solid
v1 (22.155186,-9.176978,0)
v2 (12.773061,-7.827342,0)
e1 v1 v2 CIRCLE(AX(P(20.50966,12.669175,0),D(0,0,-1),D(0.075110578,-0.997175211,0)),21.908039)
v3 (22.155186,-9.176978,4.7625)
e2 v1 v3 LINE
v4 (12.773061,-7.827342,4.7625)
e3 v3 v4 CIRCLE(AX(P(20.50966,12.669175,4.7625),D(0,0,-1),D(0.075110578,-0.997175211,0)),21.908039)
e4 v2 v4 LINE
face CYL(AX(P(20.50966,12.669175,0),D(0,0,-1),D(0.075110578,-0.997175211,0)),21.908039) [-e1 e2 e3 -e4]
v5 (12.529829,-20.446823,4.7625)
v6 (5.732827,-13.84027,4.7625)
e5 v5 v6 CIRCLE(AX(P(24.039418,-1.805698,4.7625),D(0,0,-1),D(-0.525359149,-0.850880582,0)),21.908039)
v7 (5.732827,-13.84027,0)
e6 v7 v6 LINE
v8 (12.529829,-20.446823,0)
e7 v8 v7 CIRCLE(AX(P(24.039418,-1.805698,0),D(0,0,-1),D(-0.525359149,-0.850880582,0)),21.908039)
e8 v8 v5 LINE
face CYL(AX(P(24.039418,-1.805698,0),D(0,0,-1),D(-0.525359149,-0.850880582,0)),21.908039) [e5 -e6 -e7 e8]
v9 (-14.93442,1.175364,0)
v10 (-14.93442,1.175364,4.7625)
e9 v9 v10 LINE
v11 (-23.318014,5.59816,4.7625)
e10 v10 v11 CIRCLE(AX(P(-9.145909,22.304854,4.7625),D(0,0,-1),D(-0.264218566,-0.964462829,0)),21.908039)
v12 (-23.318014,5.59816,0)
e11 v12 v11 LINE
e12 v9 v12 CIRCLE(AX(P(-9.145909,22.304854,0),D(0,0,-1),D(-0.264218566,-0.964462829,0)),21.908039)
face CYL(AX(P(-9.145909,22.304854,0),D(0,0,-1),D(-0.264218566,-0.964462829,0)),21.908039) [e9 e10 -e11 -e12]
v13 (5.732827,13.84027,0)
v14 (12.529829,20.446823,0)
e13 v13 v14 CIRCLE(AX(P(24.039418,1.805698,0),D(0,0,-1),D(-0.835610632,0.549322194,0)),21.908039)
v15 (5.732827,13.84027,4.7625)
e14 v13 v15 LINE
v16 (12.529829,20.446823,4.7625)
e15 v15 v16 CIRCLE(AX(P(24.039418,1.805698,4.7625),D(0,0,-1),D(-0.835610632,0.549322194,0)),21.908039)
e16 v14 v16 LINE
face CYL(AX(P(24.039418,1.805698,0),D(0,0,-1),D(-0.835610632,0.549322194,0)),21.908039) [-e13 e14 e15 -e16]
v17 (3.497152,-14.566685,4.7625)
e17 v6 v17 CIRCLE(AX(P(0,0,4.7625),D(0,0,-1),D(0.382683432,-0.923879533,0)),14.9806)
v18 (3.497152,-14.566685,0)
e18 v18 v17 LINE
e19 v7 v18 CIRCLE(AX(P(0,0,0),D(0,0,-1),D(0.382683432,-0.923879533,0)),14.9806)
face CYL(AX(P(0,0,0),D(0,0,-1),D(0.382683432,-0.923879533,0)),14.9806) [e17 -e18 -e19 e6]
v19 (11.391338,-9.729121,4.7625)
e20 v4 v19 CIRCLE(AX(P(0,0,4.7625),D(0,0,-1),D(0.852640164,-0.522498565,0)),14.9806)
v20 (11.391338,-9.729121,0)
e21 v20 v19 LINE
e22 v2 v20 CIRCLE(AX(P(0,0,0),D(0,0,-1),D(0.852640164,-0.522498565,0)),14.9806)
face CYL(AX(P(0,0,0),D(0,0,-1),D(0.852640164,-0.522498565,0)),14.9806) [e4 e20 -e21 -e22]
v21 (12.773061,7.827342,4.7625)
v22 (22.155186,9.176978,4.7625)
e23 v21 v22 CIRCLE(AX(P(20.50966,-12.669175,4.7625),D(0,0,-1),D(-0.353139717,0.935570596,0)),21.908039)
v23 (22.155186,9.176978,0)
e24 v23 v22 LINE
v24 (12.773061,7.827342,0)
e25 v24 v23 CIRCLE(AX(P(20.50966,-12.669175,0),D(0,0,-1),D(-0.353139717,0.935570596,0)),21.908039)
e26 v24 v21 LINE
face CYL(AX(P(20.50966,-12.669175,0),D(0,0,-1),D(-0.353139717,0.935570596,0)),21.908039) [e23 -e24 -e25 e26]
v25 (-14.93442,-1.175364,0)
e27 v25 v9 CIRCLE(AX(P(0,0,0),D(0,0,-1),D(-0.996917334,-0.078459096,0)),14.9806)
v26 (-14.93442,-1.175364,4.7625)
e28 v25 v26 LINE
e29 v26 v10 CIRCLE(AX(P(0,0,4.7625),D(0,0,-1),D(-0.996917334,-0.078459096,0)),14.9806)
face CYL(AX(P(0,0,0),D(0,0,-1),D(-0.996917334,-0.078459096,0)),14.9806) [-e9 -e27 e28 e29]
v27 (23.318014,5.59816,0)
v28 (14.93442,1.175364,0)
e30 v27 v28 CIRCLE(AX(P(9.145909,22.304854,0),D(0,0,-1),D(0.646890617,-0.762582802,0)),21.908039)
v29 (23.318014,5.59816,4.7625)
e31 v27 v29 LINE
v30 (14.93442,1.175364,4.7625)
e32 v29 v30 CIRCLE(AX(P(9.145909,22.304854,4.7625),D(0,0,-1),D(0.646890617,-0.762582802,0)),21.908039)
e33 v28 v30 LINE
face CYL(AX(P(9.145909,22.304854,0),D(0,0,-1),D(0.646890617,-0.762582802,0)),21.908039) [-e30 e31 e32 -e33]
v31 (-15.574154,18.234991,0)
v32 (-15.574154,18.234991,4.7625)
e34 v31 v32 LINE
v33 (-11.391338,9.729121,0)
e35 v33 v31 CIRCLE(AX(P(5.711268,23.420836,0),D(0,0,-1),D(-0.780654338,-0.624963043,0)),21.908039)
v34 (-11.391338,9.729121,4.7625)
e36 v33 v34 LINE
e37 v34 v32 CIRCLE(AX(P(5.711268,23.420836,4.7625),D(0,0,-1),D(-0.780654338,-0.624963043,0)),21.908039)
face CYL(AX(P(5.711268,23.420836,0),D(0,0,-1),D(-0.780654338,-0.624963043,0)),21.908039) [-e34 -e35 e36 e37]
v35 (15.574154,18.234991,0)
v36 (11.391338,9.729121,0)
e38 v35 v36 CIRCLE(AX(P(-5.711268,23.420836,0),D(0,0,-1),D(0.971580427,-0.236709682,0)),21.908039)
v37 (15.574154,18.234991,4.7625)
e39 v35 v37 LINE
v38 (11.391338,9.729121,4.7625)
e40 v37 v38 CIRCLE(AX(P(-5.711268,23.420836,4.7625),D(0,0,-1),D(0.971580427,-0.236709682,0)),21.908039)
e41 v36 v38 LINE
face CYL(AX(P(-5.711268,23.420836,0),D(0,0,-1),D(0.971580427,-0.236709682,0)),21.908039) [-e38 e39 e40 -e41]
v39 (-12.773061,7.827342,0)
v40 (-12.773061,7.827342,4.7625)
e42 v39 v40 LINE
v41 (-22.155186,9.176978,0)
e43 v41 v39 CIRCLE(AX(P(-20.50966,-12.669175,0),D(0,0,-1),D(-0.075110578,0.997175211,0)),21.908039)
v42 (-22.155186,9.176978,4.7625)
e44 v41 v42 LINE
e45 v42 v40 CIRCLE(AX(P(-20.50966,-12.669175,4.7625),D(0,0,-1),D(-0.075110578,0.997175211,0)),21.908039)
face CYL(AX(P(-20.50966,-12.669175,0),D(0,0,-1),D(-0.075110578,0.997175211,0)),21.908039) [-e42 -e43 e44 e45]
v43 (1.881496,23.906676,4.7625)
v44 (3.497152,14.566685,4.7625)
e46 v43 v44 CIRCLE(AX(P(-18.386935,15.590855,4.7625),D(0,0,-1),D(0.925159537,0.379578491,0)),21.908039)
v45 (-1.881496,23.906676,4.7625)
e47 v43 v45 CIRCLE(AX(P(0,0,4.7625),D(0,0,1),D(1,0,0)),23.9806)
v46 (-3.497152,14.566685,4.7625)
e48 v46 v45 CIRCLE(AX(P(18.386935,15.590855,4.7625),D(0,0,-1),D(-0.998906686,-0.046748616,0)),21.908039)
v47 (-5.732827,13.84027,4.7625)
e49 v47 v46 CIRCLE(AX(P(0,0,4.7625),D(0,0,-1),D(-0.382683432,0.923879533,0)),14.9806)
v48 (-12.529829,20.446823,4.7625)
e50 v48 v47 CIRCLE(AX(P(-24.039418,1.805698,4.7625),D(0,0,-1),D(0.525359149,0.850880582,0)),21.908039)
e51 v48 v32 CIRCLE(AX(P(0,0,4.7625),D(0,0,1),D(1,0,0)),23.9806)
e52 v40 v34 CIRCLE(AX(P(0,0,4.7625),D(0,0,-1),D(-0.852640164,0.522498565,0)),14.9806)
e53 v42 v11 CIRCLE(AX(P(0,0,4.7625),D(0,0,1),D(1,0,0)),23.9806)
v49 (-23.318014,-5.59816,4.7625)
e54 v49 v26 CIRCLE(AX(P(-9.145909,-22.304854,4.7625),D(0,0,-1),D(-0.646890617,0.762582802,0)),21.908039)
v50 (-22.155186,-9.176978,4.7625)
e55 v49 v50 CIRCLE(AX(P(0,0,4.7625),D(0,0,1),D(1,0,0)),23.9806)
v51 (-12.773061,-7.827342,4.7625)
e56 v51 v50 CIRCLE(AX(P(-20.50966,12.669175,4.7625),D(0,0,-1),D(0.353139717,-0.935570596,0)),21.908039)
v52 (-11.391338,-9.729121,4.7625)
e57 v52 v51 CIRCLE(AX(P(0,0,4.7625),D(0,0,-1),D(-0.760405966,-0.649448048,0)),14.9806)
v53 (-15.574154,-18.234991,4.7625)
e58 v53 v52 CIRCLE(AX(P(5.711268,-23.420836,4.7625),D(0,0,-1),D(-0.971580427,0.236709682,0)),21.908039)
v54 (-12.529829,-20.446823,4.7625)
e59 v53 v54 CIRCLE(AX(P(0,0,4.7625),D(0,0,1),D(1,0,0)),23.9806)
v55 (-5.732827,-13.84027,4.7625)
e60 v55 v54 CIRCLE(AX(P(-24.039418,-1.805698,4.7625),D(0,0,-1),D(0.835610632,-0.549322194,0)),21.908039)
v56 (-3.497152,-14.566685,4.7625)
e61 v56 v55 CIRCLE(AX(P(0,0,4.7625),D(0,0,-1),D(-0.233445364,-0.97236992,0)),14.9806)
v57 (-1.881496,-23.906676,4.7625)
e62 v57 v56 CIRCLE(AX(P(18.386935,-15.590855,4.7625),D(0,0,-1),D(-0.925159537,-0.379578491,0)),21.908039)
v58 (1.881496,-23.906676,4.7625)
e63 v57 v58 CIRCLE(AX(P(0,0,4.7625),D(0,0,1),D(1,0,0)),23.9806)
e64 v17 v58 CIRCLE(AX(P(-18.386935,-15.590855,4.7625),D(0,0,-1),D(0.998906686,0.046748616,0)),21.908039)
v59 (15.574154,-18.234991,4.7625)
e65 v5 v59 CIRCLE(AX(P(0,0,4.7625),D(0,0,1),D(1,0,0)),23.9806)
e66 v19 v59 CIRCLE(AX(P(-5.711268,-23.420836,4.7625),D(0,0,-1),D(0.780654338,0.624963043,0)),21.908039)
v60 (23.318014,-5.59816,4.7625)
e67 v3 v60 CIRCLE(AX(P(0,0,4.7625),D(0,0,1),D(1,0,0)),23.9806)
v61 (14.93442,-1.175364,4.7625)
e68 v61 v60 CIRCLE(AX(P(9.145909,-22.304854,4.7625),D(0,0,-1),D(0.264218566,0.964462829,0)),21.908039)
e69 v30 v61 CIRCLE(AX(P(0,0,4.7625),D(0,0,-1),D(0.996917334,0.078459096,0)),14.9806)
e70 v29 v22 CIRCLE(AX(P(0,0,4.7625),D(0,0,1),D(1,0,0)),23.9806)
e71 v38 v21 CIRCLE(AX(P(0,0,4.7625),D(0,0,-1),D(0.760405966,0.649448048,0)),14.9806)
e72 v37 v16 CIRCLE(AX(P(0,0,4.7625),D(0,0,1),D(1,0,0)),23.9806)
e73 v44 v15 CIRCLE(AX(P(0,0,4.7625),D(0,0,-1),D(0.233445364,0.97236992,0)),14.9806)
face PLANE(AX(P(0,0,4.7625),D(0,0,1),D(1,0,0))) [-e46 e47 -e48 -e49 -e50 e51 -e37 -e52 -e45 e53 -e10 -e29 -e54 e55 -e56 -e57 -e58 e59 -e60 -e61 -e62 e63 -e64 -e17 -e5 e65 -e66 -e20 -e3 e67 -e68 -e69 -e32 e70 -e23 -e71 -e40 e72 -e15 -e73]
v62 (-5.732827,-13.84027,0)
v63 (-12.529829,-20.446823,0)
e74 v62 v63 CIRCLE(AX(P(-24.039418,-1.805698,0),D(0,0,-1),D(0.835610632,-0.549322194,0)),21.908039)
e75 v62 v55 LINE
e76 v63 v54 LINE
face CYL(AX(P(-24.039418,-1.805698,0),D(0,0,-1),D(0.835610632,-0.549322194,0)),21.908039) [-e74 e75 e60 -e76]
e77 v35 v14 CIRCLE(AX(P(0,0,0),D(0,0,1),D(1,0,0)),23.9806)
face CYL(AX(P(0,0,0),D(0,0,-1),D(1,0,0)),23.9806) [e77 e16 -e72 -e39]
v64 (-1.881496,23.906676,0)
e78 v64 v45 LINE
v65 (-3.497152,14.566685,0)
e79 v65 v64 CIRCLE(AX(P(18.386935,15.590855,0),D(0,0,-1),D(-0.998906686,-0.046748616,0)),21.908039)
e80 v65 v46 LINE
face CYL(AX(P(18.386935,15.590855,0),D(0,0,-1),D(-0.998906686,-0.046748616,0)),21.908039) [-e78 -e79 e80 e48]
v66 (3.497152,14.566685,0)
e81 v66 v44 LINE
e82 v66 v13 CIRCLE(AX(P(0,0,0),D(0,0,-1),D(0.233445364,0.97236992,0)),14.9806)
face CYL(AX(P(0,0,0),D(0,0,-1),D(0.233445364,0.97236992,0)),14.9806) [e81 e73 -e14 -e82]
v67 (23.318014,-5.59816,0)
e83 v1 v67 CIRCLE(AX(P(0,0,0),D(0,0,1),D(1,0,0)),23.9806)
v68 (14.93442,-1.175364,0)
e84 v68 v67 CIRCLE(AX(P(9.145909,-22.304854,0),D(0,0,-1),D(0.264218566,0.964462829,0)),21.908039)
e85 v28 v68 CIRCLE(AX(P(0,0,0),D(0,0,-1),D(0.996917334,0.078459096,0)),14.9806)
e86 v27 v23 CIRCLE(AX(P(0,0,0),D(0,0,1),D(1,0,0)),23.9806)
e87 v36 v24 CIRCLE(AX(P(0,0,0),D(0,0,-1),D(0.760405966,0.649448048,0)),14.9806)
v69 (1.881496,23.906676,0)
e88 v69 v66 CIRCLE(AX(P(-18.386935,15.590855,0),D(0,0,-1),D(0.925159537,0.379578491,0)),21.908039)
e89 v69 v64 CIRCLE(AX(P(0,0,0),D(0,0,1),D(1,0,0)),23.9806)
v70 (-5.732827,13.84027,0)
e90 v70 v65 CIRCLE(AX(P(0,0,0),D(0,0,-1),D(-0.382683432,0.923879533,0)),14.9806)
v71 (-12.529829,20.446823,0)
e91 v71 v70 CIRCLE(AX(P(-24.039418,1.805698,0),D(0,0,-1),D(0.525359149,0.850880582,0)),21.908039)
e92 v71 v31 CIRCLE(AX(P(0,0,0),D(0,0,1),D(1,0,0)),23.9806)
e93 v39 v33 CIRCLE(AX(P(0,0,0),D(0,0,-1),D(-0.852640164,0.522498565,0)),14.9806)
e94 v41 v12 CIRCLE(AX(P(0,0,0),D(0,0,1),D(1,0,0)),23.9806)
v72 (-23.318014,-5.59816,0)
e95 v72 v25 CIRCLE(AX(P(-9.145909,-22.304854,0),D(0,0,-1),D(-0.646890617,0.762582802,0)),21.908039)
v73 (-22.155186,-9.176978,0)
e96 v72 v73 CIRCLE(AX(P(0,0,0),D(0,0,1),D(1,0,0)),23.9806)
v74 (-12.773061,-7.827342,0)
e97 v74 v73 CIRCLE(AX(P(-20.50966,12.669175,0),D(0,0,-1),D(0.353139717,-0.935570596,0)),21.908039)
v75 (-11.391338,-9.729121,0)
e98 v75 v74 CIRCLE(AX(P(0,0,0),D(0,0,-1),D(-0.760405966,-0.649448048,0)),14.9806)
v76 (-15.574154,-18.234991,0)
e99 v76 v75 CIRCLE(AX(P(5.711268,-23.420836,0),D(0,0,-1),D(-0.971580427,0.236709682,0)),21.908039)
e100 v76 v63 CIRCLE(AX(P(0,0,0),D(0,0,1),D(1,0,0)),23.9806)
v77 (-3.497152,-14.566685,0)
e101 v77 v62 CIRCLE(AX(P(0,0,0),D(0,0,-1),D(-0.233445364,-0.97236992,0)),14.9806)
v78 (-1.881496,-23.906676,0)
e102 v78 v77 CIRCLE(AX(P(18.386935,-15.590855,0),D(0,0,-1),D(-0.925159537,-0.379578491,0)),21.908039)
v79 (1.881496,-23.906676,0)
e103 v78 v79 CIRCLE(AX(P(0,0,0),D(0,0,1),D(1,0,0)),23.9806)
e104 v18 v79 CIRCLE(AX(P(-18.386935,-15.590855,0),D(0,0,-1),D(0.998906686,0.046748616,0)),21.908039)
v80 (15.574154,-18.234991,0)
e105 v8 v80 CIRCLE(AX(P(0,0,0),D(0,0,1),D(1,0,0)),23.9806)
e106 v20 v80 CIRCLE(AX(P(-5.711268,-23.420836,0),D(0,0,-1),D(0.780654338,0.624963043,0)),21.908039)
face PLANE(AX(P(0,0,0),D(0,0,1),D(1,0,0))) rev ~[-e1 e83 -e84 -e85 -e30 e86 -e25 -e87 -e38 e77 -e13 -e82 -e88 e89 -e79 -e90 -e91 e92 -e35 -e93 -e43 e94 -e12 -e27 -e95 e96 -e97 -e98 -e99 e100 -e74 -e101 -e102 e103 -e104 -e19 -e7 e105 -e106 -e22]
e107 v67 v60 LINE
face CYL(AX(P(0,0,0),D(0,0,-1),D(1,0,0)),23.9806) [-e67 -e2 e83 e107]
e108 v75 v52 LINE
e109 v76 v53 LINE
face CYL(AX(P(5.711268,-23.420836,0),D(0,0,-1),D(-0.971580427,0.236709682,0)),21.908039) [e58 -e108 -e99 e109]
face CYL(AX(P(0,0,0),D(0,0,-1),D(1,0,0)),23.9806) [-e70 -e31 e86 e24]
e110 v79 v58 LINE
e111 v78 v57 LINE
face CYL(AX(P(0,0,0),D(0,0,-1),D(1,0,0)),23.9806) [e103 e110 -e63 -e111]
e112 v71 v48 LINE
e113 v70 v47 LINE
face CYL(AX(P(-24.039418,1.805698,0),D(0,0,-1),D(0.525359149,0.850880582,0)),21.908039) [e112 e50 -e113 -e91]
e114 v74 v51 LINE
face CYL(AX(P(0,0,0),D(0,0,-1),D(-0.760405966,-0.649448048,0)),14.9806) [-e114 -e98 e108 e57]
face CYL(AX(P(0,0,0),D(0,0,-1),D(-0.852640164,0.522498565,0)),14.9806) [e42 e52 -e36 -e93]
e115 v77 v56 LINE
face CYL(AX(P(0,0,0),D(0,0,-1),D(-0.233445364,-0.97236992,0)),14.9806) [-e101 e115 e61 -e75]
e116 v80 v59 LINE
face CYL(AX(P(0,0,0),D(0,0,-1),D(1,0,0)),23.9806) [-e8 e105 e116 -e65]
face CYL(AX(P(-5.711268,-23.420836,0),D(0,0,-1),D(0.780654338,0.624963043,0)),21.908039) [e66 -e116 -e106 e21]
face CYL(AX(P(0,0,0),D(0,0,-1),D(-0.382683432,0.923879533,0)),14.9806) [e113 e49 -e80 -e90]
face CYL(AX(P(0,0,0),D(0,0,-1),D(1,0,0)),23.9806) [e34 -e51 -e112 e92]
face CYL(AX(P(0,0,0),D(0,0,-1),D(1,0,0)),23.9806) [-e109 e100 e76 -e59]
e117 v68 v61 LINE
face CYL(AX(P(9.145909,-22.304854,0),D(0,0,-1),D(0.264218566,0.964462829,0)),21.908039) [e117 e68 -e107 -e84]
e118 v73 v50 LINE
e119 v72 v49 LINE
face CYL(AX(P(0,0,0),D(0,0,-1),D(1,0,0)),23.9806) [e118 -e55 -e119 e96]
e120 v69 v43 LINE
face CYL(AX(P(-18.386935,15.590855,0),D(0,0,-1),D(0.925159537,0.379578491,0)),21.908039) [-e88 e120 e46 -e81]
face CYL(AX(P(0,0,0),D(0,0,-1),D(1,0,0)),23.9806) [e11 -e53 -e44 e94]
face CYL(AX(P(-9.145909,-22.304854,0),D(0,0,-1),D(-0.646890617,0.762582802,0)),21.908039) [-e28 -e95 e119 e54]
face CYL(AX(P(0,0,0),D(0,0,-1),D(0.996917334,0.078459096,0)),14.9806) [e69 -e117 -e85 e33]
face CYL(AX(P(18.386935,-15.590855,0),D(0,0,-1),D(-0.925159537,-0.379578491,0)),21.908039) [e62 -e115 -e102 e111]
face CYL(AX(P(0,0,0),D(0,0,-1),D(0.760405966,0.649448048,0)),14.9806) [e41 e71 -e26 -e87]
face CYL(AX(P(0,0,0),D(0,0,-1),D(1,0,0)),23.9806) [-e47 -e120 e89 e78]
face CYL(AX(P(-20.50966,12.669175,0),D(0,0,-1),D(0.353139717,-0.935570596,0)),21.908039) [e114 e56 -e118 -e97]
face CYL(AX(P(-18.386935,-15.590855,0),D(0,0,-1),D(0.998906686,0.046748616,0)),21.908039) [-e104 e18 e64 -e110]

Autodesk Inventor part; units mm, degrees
sketch "Sketch1" plane through (0, 0, 0) normal (0, 0, 1) x (1, 0, 0)
  circle A0 centre (0, 0) radius 23.9806
  dimension "d0" = 47.9612
extrude "Extrusion1" add sketch "Sketch1" along normal blind 4.7625
sketch "Sketch2" plane through (0, 0, 0) normal (0, 0, -1) x (-1, 0, 0)
  circle A0 centre (0, 0) radius 23.9806 projected
  circle A1 centre (0, 0) radius 20
  dimension "d3" = 40
surface extrude "Pitch Diameter" sketch "Sketch2" against normal through all shown no curves A1
ref_plane "Work Plane1" through (0, 0, 0) normal (1, 0, 0) x (0, 1, 0)
ref_plane "Work Plane2" through (0, 0, 0) normal (0.9510565, 0.309017, 0) x (0, 0, 1)
ref_plane "Work Plane3" through (0, 0, 2.3813) normal (0, 0, -1) x (-1, 0, 0)
spur gear teeth "Spur Gear" teeth 10 pitch diameter 40 tip diameter 47.9612 root diameter 29.9612 face width 4.7625 start plane through (0, 0, 0) normal (0, 0, -1) x (-1, 0, 0)
equation "\"d0\" = da_da"
equation "\"d1\" = da_b"
equation "\"d3\" = da_d"
equation "\"d15\" = da_aw"
equation "\"d19\" = da_aw"
equation "\"da_da\" = 47.961175"
equation "\"da_b\" = 4.7625"
equation "\"da_d\" = 40"
equation "\"da_aw\" = 746.76"
properties part number "PINION" material "Steel"
